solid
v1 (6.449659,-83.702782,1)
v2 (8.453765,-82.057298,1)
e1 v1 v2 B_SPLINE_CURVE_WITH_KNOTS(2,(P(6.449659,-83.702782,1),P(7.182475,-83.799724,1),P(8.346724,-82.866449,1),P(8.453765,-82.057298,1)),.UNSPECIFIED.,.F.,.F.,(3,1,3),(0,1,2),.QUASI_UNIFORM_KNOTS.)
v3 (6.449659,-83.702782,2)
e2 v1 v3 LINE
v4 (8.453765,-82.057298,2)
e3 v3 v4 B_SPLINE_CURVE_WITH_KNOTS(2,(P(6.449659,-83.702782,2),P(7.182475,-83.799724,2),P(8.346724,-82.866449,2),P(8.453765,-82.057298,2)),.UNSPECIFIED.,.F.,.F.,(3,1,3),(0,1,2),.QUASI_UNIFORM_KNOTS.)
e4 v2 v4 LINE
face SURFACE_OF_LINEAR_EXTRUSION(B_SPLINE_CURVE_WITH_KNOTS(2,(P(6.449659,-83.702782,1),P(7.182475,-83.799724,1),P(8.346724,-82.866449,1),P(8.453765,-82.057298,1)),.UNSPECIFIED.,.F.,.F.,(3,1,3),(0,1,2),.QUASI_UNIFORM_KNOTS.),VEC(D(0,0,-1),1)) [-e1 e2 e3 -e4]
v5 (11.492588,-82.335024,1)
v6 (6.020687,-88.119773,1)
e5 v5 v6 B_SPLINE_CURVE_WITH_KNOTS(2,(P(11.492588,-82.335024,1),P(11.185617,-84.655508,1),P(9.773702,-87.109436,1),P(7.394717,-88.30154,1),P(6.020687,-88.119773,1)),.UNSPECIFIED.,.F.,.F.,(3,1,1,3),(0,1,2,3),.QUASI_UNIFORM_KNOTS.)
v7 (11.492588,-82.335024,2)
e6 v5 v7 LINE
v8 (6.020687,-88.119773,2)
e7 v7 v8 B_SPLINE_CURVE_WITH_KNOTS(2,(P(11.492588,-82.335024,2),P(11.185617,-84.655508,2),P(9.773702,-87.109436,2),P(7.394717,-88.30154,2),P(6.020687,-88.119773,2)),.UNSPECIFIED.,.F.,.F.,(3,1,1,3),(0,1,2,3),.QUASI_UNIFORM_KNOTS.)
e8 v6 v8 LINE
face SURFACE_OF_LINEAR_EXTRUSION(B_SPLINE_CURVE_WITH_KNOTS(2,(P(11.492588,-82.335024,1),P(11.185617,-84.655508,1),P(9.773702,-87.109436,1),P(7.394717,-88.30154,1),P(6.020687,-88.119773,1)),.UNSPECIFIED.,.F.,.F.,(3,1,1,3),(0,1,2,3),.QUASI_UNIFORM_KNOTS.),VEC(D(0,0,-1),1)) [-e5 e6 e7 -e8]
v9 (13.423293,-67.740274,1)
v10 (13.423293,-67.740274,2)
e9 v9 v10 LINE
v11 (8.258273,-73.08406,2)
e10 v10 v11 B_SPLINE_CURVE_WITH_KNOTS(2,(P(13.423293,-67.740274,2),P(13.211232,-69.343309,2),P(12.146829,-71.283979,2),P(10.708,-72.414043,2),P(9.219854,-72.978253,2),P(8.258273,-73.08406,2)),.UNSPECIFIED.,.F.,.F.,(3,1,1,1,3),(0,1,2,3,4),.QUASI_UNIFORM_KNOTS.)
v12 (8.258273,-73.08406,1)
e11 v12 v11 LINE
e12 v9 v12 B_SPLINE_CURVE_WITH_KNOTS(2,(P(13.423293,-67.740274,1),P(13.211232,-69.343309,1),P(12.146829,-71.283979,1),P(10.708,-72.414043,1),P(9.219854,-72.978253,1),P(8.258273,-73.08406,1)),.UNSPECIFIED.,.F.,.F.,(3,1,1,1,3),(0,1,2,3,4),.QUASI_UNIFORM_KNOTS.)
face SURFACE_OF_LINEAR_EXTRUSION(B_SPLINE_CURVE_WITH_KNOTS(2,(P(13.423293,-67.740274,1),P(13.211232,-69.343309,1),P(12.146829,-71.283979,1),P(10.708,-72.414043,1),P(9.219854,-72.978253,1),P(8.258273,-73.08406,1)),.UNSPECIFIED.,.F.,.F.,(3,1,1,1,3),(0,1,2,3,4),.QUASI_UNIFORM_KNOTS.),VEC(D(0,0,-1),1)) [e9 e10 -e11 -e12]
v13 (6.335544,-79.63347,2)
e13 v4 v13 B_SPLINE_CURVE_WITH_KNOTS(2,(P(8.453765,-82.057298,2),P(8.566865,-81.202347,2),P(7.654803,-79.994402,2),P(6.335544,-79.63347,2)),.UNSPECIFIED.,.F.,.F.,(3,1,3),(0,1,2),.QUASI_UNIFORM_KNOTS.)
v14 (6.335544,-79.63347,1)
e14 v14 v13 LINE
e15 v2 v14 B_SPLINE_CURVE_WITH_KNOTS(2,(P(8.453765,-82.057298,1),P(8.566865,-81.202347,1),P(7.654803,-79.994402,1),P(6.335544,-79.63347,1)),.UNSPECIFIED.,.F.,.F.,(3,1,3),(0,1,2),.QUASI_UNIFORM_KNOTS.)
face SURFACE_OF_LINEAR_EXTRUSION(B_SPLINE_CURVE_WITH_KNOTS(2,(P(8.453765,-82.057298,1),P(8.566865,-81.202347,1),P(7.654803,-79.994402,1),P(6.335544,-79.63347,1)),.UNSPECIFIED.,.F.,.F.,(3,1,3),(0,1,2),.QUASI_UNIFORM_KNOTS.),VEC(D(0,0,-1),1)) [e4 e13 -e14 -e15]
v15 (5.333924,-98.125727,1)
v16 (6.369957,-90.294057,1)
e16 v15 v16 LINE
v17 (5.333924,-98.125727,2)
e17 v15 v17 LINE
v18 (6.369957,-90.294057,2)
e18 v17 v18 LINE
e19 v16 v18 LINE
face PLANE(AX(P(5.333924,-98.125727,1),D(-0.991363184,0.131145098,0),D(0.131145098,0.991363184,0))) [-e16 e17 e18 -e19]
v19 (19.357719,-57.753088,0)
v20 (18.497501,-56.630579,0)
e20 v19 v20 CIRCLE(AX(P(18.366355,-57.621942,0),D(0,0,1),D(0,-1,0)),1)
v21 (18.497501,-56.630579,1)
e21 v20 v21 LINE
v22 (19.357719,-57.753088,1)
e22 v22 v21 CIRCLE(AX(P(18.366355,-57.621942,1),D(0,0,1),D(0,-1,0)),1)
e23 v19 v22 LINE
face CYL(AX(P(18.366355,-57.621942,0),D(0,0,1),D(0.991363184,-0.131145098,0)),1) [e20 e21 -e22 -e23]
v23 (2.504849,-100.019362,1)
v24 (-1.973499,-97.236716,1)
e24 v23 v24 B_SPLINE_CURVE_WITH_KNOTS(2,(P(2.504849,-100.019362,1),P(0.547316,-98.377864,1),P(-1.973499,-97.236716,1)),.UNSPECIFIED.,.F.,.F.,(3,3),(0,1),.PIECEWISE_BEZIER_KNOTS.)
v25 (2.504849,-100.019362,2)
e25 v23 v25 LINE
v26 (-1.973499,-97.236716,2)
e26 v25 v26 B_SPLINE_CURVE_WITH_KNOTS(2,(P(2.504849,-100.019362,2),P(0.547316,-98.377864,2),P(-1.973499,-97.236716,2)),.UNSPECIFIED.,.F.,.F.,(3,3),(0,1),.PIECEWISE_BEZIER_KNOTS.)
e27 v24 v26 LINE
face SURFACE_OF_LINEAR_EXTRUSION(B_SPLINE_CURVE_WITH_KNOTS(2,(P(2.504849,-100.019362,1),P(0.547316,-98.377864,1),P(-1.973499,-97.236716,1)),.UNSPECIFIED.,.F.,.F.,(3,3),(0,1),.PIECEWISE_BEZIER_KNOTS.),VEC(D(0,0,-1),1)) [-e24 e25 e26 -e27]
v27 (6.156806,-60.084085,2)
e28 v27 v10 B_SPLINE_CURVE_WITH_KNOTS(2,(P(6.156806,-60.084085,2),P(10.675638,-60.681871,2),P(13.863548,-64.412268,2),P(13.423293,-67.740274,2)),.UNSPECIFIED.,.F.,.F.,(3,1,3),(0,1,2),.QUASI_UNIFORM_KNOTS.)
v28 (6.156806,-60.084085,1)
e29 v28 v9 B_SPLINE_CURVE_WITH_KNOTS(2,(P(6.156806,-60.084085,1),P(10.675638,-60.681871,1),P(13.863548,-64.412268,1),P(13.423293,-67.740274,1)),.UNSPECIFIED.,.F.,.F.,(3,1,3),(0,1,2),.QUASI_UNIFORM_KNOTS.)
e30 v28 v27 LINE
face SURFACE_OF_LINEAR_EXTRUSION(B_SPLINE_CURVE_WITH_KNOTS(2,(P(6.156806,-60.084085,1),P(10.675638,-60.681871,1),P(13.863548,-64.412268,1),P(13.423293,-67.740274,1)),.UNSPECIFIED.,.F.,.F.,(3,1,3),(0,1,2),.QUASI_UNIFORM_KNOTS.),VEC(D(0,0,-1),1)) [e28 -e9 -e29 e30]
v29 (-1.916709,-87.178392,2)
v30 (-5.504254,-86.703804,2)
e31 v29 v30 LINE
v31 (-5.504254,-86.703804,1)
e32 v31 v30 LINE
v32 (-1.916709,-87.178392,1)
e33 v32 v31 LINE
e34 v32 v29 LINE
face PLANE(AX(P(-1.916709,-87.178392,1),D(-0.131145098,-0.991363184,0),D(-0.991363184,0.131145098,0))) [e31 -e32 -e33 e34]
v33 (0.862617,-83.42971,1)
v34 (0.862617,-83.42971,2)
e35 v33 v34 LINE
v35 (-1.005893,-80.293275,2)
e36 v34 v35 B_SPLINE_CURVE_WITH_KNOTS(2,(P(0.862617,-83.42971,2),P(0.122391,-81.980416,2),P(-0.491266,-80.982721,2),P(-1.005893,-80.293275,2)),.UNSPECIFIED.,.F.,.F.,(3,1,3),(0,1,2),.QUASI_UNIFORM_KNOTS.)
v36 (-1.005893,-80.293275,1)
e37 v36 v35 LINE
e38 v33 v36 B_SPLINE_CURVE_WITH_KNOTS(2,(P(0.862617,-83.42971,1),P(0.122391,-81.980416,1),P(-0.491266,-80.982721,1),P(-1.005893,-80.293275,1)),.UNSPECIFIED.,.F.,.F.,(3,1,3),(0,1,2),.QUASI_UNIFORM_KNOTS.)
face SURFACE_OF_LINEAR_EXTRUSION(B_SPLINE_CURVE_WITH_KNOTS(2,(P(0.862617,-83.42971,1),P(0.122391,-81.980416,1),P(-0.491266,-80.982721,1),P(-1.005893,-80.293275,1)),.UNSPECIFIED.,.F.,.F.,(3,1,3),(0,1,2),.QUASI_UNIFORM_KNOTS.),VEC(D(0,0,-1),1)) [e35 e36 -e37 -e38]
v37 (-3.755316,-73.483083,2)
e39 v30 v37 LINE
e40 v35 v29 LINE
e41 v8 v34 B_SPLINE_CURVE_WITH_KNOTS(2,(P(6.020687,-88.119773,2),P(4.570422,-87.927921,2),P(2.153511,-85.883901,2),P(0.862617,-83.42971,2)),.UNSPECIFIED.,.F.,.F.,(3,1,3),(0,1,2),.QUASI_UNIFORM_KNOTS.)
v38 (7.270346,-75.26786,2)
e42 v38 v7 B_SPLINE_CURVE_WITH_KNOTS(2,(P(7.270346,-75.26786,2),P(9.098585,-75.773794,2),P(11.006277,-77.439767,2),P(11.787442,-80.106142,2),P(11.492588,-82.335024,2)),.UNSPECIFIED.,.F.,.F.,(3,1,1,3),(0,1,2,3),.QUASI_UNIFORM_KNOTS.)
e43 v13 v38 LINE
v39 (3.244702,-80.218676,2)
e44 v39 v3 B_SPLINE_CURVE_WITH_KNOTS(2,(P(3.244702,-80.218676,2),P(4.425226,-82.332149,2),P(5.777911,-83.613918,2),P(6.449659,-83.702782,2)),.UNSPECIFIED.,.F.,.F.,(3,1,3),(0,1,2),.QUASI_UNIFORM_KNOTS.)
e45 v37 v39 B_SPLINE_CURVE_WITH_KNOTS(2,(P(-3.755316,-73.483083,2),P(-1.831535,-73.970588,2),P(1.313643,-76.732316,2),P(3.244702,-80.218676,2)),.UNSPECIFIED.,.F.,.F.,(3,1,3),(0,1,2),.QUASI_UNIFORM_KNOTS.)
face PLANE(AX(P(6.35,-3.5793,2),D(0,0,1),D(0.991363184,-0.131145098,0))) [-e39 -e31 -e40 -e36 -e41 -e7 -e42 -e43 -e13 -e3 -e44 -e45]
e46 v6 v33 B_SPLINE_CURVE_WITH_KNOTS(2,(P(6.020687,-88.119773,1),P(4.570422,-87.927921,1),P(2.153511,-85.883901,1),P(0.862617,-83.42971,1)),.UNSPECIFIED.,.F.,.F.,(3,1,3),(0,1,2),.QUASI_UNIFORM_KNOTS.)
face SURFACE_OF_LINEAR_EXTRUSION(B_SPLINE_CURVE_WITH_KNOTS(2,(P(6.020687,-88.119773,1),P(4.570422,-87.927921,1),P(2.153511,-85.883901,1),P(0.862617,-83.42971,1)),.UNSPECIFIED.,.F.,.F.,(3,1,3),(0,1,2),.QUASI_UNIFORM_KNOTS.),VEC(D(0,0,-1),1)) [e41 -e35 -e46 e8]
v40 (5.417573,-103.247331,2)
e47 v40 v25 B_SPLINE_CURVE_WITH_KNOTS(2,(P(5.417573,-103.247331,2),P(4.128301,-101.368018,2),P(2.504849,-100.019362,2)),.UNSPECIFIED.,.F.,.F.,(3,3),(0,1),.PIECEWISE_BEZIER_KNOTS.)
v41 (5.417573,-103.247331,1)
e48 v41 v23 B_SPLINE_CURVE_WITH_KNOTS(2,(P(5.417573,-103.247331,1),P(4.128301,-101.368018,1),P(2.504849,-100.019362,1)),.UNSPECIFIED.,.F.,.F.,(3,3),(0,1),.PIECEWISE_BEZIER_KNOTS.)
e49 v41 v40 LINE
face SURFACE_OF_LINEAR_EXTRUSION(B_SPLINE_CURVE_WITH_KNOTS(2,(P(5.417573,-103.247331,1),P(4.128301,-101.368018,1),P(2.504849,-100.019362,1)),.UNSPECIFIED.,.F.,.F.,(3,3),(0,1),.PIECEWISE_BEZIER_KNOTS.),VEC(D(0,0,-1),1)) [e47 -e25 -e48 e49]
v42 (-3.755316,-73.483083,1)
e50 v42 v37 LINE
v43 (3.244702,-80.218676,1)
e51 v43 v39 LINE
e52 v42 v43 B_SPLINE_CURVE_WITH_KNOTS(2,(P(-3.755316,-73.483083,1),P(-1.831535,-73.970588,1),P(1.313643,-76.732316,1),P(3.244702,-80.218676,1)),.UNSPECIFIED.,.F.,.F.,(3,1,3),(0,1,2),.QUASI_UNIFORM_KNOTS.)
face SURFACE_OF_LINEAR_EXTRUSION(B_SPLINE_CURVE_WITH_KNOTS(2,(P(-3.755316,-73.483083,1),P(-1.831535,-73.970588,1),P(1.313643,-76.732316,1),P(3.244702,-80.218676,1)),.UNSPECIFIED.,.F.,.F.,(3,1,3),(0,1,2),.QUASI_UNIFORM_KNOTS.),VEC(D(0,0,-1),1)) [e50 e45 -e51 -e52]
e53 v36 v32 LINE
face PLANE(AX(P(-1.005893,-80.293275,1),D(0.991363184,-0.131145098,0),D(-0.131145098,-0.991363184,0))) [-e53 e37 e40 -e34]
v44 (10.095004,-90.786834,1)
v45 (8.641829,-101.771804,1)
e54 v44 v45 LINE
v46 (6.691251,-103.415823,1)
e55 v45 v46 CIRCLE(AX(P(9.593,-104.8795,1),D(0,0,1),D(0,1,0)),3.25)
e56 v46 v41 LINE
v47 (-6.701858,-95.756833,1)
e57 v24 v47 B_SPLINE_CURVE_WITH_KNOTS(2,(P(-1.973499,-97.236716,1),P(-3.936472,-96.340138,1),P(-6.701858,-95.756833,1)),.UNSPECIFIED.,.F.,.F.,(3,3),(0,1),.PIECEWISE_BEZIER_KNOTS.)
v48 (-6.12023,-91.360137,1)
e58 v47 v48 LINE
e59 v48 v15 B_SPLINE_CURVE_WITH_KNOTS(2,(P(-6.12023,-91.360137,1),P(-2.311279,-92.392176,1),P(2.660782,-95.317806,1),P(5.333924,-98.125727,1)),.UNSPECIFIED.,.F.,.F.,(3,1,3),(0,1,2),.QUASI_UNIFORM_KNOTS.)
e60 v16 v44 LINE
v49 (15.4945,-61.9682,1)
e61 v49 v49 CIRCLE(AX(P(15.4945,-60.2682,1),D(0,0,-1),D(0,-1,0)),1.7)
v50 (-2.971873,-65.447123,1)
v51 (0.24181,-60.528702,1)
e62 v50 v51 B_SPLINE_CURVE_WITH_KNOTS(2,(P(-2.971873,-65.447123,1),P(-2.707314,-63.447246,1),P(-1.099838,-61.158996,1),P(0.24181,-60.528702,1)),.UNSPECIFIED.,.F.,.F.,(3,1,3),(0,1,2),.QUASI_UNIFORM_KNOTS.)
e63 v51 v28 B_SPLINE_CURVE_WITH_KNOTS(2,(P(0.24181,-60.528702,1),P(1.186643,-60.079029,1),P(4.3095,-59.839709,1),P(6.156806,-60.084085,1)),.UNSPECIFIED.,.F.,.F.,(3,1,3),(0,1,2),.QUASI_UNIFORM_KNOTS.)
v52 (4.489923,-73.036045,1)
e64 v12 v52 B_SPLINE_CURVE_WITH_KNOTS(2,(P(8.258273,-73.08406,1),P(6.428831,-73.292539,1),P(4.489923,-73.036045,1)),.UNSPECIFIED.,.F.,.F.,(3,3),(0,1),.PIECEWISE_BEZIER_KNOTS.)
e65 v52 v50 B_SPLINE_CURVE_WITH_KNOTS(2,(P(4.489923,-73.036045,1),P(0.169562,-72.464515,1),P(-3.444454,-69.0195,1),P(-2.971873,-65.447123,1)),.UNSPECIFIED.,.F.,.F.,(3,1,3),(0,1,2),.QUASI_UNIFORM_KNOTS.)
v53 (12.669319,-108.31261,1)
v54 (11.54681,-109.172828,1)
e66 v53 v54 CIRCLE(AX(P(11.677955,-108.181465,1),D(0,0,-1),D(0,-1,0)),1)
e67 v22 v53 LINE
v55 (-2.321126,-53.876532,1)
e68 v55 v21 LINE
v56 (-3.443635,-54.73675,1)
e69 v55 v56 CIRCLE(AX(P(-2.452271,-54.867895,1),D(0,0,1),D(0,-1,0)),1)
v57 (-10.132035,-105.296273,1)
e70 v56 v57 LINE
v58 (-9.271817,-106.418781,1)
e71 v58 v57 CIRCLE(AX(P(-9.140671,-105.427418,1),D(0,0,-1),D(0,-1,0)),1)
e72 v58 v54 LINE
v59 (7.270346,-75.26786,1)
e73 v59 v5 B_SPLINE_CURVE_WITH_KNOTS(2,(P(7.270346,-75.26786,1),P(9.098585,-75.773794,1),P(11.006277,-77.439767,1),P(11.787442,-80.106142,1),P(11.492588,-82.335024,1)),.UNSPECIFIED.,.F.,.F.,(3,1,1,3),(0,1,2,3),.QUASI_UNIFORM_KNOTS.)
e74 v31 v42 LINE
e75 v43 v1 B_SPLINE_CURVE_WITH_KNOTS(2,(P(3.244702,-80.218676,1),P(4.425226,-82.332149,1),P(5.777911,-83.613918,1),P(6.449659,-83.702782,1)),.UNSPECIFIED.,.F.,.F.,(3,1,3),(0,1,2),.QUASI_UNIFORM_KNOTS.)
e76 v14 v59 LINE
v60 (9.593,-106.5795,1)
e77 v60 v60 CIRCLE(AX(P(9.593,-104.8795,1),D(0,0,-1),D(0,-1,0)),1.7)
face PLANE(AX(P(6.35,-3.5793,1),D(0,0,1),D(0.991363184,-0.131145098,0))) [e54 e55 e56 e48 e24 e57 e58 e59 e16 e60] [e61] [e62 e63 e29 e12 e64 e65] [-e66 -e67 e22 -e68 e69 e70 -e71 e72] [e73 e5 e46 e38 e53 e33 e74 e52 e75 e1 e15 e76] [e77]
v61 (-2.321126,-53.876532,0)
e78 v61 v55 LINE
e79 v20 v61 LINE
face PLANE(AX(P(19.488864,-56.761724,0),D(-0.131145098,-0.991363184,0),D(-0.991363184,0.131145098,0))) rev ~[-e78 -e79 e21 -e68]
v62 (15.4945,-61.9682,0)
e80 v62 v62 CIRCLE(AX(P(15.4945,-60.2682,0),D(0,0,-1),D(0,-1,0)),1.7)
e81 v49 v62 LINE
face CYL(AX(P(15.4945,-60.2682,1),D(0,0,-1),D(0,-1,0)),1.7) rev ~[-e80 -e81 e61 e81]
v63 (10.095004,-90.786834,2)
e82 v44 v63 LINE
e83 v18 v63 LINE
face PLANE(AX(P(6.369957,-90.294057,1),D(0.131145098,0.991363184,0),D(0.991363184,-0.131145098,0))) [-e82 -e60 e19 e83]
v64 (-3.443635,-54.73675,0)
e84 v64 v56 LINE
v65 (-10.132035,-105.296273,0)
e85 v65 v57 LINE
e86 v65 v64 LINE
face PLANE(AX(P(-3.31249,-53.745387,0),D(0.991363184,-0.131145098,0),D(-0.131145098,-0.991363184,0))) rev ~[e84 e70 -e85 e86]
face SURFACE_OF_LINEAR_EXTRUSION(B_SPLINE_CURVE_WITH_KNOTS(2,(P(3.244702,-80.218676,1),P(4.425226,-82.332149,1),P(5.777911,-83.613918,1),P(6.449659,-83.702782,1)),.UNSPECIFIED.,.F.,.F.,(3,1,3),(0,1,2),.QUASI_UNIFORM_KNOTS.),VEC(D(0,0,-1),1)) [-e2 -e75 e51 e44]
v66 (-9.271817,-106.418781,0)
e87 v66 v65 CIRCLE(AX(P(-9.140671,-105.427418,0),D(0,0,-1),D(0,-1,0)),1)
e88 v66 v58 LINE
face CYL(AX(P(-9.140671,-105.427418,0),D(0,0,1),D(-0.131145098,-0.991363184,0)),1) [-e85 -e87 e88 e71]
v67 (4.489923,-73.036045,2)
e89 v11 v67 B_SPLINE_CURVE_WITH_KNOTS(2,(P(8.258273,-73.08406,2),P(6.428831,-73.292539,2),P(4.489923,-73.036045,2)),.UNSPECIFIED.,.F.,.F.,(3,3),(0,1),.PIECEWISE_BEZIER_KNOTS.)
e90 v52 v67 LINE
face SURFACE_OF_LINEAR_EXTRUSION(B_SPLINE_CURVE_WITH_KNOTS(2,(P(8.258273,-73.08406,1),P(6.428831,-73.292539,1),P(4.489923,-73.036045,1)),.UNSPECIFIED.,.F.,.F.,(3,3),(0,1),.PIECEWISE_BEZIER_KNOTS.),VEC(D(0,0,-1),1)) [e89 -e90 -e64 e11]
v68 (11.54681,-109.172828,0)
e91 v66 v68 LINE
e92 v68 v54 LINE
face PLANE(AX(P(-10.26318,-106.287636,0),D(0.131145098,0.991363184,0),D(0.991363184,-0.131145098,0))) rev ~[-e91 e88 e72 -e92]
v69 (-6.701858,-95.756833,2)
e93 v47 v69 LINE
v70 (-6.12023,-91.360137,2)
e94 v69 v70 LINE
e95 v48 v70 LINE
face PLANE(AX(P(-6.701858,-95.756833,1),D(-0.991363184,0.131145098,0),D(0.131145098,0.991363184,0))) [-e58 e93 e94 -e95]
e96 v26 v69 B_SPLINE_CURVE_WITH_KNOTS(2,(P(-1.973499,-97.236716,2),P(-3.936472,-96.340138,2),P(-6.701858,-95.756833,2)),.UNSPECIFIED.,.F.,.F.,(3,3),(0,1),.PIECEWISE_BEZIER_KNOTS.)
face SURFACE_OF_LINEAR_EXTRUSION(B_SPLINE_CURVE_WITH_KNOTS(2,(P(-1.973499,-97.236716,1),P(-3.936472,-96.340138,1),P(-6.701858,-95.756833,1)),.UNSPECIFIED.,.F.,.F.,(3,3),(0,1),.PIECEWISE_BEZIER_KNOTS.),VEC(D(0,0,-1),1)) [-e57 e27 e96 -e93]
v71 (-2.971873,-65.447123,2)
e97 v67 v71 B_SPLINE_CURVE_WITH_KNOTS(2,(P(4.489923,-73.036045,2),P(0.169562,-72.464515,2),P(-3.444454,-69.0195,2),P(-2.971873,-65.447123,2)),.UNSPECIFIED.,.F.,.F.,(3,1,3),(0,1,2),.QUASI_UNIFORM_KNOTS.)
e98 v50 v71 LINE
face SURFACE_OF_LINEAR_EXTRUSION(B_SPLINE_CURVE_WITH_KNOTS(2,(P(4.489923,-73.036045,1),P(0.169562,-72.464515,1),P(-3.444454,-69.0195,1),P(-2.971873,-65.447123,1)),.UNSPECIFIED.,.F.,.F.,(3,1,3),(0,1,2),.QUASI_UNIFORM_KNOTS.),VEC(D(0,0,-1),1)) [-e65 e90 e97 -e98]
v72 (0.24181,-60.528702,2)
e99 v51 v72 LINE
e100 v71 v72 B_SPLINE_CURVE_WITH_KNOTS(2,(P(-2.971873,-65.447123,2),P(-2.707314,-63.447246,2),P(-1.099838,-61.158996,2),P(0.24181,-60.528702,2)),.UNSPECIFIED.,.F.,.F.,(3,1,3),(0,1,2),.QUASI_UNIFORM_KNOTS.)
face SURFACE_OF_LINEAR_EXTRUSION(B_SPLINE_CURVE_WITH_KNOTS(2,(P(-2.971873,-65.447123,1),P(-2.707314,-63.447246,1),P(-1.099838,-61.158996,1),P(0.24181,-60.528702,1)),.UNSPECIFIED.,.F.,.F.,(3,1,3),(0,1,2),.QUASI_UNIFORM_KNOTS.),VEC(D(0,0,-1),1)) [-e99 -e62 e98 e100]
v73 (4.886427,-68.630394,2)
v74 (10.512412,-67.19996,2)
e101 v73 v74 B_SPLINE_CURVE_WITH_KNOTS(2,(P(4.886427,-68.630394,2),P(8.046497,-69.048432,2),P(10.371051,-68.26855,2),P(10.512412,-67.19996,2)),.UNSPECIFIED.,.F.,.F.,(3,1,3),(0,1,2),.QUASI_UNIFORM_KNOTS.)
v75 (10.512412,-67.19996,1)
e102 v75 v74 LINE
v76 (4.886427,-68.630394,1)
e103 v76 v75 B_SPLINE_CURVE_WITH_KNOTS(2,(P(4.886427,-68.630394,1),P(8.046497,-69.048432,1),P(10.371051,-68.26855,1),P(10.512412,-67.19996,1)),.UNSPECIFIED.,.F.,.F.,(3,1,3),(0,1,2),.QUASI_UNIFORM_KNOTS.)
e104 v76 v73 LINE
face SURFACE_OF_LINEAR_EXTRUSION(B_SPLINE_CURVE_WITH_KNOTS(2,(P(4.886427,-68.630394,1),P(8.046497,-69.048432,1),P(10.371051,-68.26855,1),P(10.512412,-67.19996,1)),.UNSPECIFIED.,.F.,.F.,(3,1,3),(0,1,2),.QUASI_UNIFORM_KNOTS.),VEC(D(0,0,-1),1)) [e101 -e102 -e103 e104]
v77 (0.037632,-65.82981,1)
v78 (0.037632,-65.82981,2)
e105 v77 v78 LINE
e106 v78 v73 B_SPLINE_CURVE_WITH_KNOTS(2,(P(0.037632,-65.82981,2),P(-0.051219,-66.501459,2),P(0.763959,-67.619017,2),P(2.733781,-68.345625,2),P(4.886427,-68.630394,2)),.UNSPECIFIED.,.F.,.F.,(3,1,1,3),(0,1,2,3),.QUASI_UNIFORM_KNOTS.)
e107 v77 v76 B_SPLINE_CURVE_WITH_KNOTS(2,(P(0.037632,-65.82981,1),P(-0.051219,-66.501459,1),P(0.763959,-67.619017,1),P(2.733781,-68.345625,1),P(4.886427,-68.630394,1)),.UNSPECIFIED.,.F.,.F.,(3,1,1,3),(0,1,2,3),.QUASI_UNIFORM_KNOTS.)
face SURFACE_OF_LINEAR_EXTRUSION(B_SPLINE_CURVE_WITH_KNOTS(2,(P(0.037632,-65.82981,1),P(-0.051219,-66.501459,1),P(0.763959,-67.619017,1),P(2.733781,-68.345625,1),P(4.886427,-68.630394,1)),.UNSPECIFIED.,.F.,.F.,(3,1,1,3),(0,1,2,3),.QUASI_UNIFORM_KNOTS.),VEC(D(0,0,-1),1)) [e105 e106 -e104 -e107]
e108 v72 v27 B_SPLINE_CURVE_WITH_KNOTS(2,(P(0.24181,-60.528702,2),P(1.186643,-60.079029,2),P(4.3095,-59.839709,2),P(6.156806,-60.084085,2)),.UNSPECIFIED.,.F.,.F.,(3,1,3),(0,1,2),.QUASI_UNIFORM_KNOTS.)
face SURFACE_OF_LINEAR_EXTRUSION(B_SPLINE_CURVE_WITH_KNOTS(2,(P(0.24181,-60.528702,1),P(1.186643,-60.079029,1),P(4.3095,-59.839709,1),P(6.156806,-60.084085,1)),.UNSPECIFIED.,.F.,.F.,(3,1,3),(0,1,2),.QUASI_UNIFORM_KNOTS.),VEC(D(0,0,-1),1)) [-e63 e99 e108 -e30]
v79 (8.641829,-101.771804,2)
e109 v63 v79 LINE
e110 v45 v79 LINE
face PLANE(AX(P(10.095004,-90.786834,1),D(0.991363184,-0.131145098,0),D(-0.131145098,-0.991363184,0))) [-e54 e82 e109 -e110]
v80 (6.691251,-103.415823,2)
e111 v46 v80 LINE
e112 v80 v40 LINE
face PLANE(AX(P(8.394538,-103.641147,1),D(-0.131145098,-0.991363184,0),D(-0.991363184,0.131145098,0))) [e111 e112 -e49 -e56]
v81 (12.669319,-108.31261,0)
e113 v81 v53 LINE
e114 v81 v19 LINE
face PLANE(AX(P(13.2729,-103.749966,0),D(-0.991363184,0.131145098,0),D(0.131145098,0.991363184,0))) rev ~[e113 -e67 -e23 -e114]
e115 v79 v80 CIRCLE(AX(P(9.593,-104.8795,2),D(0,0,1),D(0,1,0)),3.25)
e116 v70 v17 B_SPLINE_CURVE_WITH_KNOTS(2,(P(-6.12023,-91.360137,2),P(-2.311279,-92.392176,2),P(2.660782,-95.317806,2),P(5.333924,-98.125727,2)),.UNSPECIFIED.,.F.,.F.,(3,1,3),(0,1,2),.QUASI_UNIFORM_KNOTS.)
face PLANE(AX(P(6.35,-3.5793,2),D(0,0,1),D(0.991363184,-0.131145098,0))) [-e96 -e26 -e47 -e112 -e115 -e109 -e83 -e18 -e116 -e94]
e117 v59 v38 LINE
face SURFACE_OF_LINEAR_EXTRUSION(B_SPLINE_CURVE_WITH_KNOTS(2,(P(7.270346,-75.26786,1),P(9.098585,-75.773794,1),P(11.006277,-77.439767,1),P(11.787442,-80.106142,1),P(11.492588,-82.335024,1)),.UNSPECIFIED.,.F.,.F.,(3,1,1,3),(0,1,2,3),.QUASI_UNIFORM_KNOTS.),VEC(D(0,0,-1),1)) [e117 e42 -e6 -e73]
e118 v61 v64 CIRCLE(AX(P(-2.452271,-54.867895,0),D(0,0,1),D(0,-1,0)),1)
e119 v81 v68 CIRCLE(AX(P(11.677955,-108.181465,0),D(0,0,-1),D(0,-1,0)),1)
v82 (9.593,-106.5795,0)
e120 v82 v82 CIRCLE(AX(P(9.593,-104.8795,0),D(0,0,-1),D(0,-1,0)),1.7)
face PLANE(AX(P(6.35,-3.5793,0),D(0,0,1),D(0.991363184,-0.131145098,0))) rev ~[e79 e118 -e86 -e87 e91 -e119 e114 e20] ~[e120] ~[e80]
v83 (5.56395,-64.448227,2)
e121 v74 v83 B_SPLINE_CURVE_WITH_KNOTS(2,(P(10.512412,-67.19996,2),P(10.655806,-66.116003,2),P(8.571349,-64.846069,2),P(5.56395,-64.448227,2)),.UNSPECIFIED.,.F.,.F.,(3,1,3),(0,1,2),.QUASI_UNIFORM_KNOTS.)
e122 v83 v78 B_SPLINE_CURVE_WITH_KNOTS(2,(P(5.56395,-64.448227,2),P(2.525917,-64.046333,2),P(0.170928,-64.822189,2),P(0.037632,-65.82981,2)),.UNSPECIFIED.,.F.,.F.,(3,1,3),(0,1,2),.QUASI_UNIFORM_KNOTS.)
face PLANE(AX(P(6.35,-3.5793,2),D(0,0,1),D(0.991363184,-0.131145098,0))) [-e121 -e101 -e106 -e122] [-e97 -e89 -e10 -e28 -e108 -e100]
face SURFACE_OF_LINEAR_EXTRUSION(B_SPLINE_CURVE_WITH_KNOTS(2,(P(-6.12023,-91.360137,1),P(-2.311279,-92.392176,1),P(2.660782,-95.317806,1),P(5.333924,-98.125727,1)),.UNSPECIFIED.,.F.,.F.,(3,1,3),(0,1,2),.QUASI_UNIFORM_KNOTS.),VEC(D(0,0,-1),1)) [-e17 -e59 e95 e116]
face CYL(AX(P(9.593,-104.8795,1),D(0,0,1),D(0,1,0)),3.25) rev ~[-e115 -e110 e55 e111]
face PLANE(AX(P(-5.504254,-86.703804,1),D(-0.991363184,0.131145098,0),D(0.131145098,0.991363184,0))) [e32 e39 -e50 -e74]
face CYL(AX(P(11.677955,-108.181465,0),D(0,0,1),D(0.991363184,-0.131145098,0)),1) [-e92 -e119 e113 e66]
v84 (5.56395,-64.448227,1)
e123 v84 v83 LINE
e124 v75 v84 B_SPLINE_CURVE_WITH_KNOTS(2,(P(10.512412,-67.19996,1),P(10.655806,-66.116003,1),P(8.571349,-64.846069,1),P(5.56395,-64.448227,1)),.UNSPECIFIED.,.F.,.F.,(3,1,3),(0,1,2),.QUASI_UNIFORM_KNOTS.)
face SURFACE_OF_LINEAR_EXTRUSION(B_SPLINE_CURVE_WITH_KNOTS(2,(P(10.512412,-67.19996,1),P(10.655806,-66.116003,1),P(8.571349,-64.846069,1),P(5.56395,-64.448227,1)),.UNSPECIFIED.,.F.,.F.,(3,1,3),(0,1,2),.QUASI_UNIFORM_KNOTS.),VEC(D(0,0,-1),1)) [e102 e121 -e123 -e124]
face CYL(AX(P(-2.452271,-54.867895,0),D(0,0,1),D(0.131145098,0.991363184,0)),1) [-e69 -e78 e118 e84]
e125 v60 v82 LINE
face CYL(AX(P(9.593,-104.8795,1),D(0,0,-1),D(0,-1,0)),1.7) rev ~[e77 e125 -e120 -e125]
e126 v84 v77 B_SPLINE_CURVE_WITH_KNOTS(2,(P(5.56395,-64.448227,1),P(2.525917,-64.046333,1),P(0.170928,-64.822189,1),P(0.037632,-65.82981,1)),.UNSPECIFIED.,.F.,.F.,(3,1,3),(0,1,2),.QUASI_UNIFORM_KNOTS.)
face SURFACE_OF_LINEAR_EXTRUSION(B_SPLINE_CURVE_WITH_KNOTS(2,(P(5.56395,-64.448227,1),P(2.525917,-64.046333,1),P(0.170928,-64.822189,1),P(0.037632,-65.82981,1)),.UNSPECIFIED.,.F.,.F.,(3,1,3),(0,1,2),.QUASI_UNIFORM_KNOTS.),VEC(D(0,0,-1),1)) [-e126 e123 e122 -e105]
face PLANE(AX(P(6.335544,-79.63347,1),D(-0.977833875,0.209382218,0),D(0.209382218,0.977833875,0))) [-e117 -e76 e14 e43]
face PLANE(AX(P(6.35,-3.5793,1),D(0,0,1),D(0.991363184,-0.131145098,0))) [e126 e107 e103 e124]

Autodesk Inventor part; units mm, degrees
ref_plane "YZ Plane" through (0, 0, 0) normal (1, 0, 0) x (0, 1, 0)
ref_plane "XZ Plane" through (0, 0, 0) normal (0, 1, 0) x (-1, 0, 0)
ref_plane "XY Plane" through (0, 0, 0) normal (0, 0, 1) x (1, 0, 0)
ref_plane "Work Plane1" through (6.35, -3.5793, 0) normal (0, 0, 1) x (0.9913632, -0.1311451, 0)
sketch "Sketch1" plane through (6.35, -3.5793, 0) normal (0, 0, 1) x (0.9913632, -0.1311451, 0)
  line L0 (9.4349, -35.1273) -> (9.1077, -32.6537) projected
  line L1 (9.1077, -32.6537) -> (11.809, -32.2963) projected
  line L2 (11.809, -32.2963) -> (11.8581, -32.8269) projected
  line L3 (11.8581, -32.8269) -> (12.0044, -33.5342) projected
  spline S0 degree 2 poles (12.0044, -33.5342) (12.2496, -34.5127) (12.9939, -35.3621) (13.7166, -35.5719) knots 0 0 0 1 2 2 2 projected
  line L4 (13.7166, -35.5719) -> (14.274, -35.6456) projected
  line L5 (14.274, -35.6456) -> (14.6409, -38.4193) projected
  line L6 (14.6409, -38.4193) -> (0.7619, -40.2553) projected
  line L7 (0.7619, -40.2553) -> (0.2443, -36.3431) projected
  line L8 (0.2443, -36.3431) -> (9.4349, -35.1273) projected
  line L9 (-0.9482, -27.3284) -> (-1.4726, -23.3645) projected
  line L10 (-1.4726, -23.3645) -> (12.4065, -21.5284) projected
  line L11 (12.4065, -21.5284) -> (13.1225, -26.9414) projected
  spline S1 degree 2 poles (13.1225, -26.9414) (13.3717, -28.825) (11.9849, -30.9988) (10.2534, -31.5228) knots 0 0 0 1 2 2 2 projected
  spline S2 degree 2 poles (10.2534, -31.5228) (9.6848, -31.6822) (9.2839, -31.7563) (9.1286, -31.7769) knots 0 0 0 1 2 2 2 projected
  spline S3 degree 2 poles (9.1286, -31.7769) (7.1725, -32.0356) (4.658, -29.904) (4.3718, -27.7409) knots 0 0 0 1 2 2 2 projected
  line L12 (4.3718, -27.7409) -> (4.2267, -26.6439) projected
  line L13 (4.2267, -26.6439) -> (-0.9482, -27.3284) projected
  line L14 (-4.2533, -2.344) -> (-4.7325, 1.2784) projected
  line L15 (-4.7325, 1.2784) -> (9.1465, 3.1145) projected
  line L16 (9.1465, 3.1145) -> (9.8448, -2.1639) projected
  line L17 (9.8448, -2.1639) -> (2.0845, -4.5596) projected
  line L18 (2.0845, -4.5596) -> (10.2008, -4.8549) projected
  line L19 (10.2008, -4.8549) -> (10.9018, -10.154) projected
  line L20 (10.9018, -10.154) -> (-2.9773, -11.99) projected
  line L21 (-2.9773, -11.99) -> (-3.4565, -8.3676) projected
  line L22 (-3.4565, -8.3676) -> (6.1067, -7.1025) projected
  line L23 (6.1067, -7.1025) -> (-3.6564, -6.8565) projected
  line L24 (-3.6564, -6.8565) -> (-4.0562, -3.8344) projected
  line L25 (-4.0562, -3.8344) -> (5.3099, -1.0789) projected
  line L26 (5.3099, -1.0789) -> (-4.2533, -2.344) projected
  line L27 (-6.2934, 13.0772) -> (-6.8178, 17.0412) projected
  line L28 (-6.8178, 17.0412) -> (7.0613, 18.8772) projected
  line L29 (7.0613, 18.8772) -> (7.7774, 13.4643) projected
  spline S4 degree 2 poles (7.7774, 13.4643) (8.0266, 11.5806) (6.6397, 9.4068) (4.9082, 8.8829) knots 0 0 0 1 2 2 2 projected
  spline S5 degree 2 poles (4.9082, 8.8829) (4.3396, 8.7234) (3.9387, 8.6493) (3.7835, 8.6288) knots 0 0 0 1 2 2 2 projected
  spline S6 degree 2 poles (3.7835, 8.6288) (1.8273, 8.37) (-0.6872, 10.5016) (-0.9734, 12.6647) knots 0 0 0 1 2 2 2 projected
  line L30 (-0.9734, 12.6647) -> (-1.1185, 13.7618) projected
  line L31 (-1.1185, 13.7618) -> (-6.2934, 13.0772) projected
  line L32 (-8.8852, 32.6694) -> (-9.4096, 36.6333) projected
  line L33 (-9.4096, 36.6333) -> (4.4695, 38.4694) projected
  line L34 (4.4695, 38.4694) -> (5.1856, 33.0564) projected
  spline S7 degree 2 poles (5.1856, 33.0564) (5.4348, 31.1728) (4.0479, 28.999) (2.3164, 28.475) knots 0 0 0 1 2 2 2 projected
  spline S8 degree 2 poles (2.3164, 28.475) (1.7478, 28.3156) (1.3469, 28.2415) (1.1917, 28.2209) knots 0 0 0 1 2 2 2 projected
  spline S9 degree 2 poles (1.1917, 28.2209) (-0.7645, 27.9622) (-3.279, 30.0938) (-3.5652, 32.2569) knots 0 0 0 1 2 2 2 projected
  line L35 (-3.5652, 32.2569) -> (-3.7103, 33.3539) projected
  line L36 (-3.7103, 33.3539) -> (-8.8852, 32.6694) projected
  line L37 (-6.9369, 17.9416) -> (-8.0596, 26.4284) projected
  line L38 (-8.0596, 26.4284) -> (5.8195, 28.2645) projected
  line L39 (5.8195, 28.2645) -> (6.923, 19.9225) projected
  line L40 (6.923, 19.9225) -> (3.7146, 19.4981) projected
  line L41 (3.7146, 19.4981) -> (3.1354, 23.8761) projected
  line L42 (3.1354, 23.8761) -> (1.0655, 23.6022) projected
  line L43 (1.0655, 23.6022) -> (1.609, 19.4934) projected
  line L44 (1.609, 19.4934) -> (-1.4649, 19.0867) projected
  line L45 (-1.4649, 19.0867) -> (-2.0084, 23.1956) projected
  line L46 (-2.0084, 23.1956) -> (-4.3268, 22.8889) projected
  line L47 (-4.3268, 22.8889) -> (-3.7284, 18.366) projected
  line L48 (-3.7284, 18.366) -> (-6.9369, 17.9416) projected
  line L49 (-2.3023, -17.0925) -> (-2.7993, -13.3355) projected
  line L50 (-2.7993, -13.3355) -> (11.0798, -11.4995) projected
  line L51 (11.0798, -11.4995) -> (11.5768, -15.2564) projected
  line L52 (11.5768, -15.2564) -> (4.8598, -16.145) projected
  line L53 (4.8598, -16.145) -> (8.406, -17.3187) projected
  line L54 (8.406, -17.3187) -> (8.9249, -21.2413) projected
  line L55 (8.9249, -21.2413) -> (4.2393, -19.0178) projected
  line L56 (4.2393, -19.0178) -> (-1.5205, -23.0022) projected
  line L57 (-1.5205, -23.0022) -> (-2.0504, -18.9968) projected
  line L58 (-2.0504, -18.9968) -> (1.2432, -16.9078) projected
  line L59 (1.2432, -16.9078) -> (0.4818, -16.7242) projected
  line L60 (0.4818, -16.7242) -> (-2.3023, -17.0925) projected
  line L61 (20, -51) -> (-3, -51)
  line L62 (-3, -51) -> (-3, -104)
  line L63 (-3, -104) -> (20, -104)
  line L64 (20, -104) -> (20, -51)
  circle A0 centre (16.3103, -49.711) radius 1.95 projected
  circle A1 centre (-20.0656, -79.7409) radius 1.95 projected
  circle A2 centre (-37.1145, 49.1363) radius 1.95 projected
  line L65 (11.0027, -81.1536) -> (12.4808, -77.5789) projected
  line L66 (7.1679, -81.6609) -> (11.0027, -81.1536) projected
  line L67 (4.8111, -78.5935) -> (7.1679, -81.6609) projected
  line L68 (6.2892, -75.0188) -> (4.8111, -78.5935) projected
  line L69 (10.124, -74.5115) -> (6.2892, -75.0188) projected
  line L70 (12.4808, -77.5789) -> (10.124, -74.5115) projected
  line L71 (2.8138, -48.7477) -> (1.3358, -52.3224) projected
  line L72 (6.6487, -48.2404) -> (2.8138, -48.7477) projected
  line L73 (9.0054, -51.3078) -> (6.6487, -48.2404) projected
  line L74 (7.5273, -54.8825) -> (9.0054, -51.3078) projected
  line L75 (3.6925, -55.3898) -> (7.5273, -54.8825) projected
  line L76 (1.3358, -52.3224) -> (3.6925, -55.3898) projected
  line L77 (9.7896, -71.9835) -> (11.2677, -68.4088) projected
  line L78 (5.9548, -72.4908) -> (9.7896, -71.9835) projected
  line L79 (3.598, -69.4234) -> (5.9548, -72.4908) projected
  line L80 (5.0761, -65.8487) -> (3.598, -69.4234) projected
  line L81 (8.9109, -65.3414) -> (5.0761, -65.8487) projected
  line L82 (11.2677, -68.4088) -> (8.9109, -65.3414) projected
  line L83 (8.5514, -92.1198) -> (7.0733, -95.6945) projected
  line L84 (12.3863, -91.6125) -> (8.5514, -92.1198) projected
  line L85 (14.743, -94.6799) -> (12.3863, -91.6125) projected
  line L86 (13.2649, -98.2547) -> (14.743, -94.6799) projected
  line L87 (9.4301, -98.762) -> (13.2649, -98.2547) projected
  line L88 (7.0733, -95.6945) -> (9.4301, -98.762) projected
  circle A3 centre (-24, -50) radius 1.95 projected
  line L89 (-23.7833, -80.2327) -> (-27.715, -50.5115) projected
  arc A4 (-23.7833, -80.2327) -> (-21.1747, -83.3231) centre (-20.0656, -79.7409) ccw projected
  line L90 (7.3797, -99.9093) -> (-21.1747, -83.3231) projected
  arc A5 (7.3797, -99.9093) -> (7.8548, -100.0043) centre (7.7565, -99.2608) ccw projected
  line L91 (25.6777, -97.6465) -> (7.8548, -100.0043) projected
  arc A6 (25.6777, -97.6465) -> (26.3228, -96.8047) centre (25.5793, -96.903) ccw projected
  line L92 (8.768, 35.8971) -> (26.3228, -96.8047) projected
  arc A7 (8.768, 35.8971) -> (5.0328, 42.3573) centre (-0.8978, 34.6184) ccw projected
  line L93 (-5.2293, 50.2216) -> (5.0328, 42.3573) projected
  arc A8 (-5.2293, 50.2216) -> (-12.4386, 52.1485) centre (-11.1599, 42.4827) ccw projected
  line L94 (-13.3095, 52.0332) -> (-12.4386, 52.1485) projected
  line L95 (-37.6265, 52.8512) -> (-13.3095, 52.0332) projected
  arc A9 (-37.6265, 52.8512) -> (-40.8346, 48.6639) centre (-37.1145, 49.1363) ccw projected
  line L96 (-26.3408, 0.1259) -> (-40.8346, 48.6639) projected
  line L97 (-27.715, -50.5115) -> (-26.3408, 0.1259) projected
  circle A10 centre (22.2118, -94.3224) radius 1.95 projected
  point P0 (-6.7645, 2.7156)
  point P1 (1.0219, -104)
  point P2 (20, -103)
  dimension "d0" = 23
  dimension "d1" = 53
extrude "Extrusion1" add sketch "Sketch1" along normal blind 1 contours L64 L91 A5 L90 L62 L61 L71 L76 L75 L74 L73 A0 | A0 L61 | L64 L63 L62 L90 A5 L91 | L73 L74 L75 L76 L71 L61 | L66 L67 L68 L69 L70 L65 | L78 L79 L80 L81 L82 L77 | L84 L85 L86 L87 L88 L83 picked at (16.6806, -51.1045)
fillet "Fillet1" radius 1 4 edges at (-3.3125, -53.7454, 0.5) (-10.2632, -106.2877, 0.5) (12.5381, -109.304, 0.5) (19.4888, -56.7617, 0.5)
sketch "Sketch2" plane through (6.35, -3.5793, 1) normal (0, 0, 1) x (0.9913632, -0.1311451, 0)
  line L0 (15.4266, -55.1181) -> (15.4266, -70.8864) construction
  line L1 (15.4266, -70.8864) -> (9.1495, -70.8864) construction
  line L2 (9.1495, -70.8864) -> (9.1495, -55.1181) construction
  line L3 (9.1495, -55.1181) -> (15.4266, -55.1181) construction
  spline S0 degree 2 poles (7.2188, -56.0421) (11.777, -56.0421) (15.4266, -59.3222) (15.4266, -62.6792) knots 0 0 0 1 2 2 2
  spline S1 degree 2 poles (15.4266, -62.6792) (15.4266, -64.2962) (14.6259, -66.3597) (13.3477, -67.6687) (11.9464, -68.4232) (11.007, -68.6542) knots 0 0 0 1 2 3 4 4 4
  spline S2 degree 2 poles (11.007, -68.6542) (9.2207, -69.1008) (7.2649, -69.1008) knots 0 0 0 1 1 1
  spline S3 degree 2 poles (7.2649, -69.1008) (2.9069, -69.1008) (-1.1277, -66.1595) (-1.1277, -62.556) knots 0 0 0 1 2 2 2
  spline S4 degree 2 poles (-1.1277, -62.556) (-1.1277, -60.5387) (0.1658, -58.0594) (1.4132, -57.2586) knots 0 0 0 1 2 2 2
  spline S5 degree 2 poles (1.4132, -57.2586) (2.2909, -56.6889) (5.3554, -56.0421) (7.2188, -56.0421) knots 0 0 0 1 2 2 2
  spline S6 degree 2 poles (7.2034, -60.4463) (4.1389, -60.4463) (1.906, -61.5243) (1.906, -62.5407) knots 0 0 0 1 2 2 2
  spline S7 degree 2 poles (1.906, -62.5407) (1.906, -63.2182) (2.8607, -64.2192) (4.9088, -64.6812) (7.0802, -64.6812) knots 0 0 0 1 2 3 3 3
  spline S8 degree 2 poles (7.0802, -64.6812) (10.2678, -64.6812) (12.47, -63.6032) (12.47, -62.5253) knots 0 0 0 1 2 2 2
  spline S9 degree 2 poles (12.47, -62.5253) (12.47, -61.4319) (10.237, -60.4463) (7.2034, -60.4463) knots 0 0 0 1 2 2 2
  line L4 (-0.8505, -83.9612) -> (-0.8505, -70.6253)
  spline S10 degree 2 poles (-0.8505, -70.6253) (1.1206, -70.8563) (4.6008, -73.1817) (6.9724, -76.3847) knots 0 0 0 1 2 2 2
  spline S11 degree 2 poles (6.9724, -76.3847) (8.4199, -78.3251) (9.929, -79.4184) (10.6066, -79.4184) knots 0 0 0 1 2 2 2
  spline S12 degree 2 poles (10.6066, -79.4184) (11.3458, -79.4184) (12.3776, -78.3405) (12.3776, -77.5243) knots 0 0 0 1 2 2 2
  spline S13 degree 2 poles (12.3776, -77.5243) (12.3776, -76.6619) (11.315, -75.584) (9.9598, -75.3992) knots 0 0 0 1 2 2 2
  line L5 (9.9598, -75.3992) -> (10.314, -70.9487)
  spline S14 degree 2 poles (10.314, -70.9487) (12.1928, -71.2105) (14.3025, -72.6119) (15.4266, -75.1528) (15.4266, -77.4011) knots 0 0 0 1 2 3 3 3
  spline S15 degree 2 poles (15.4266, -77.4011) (15.4266, -79.7418) (14.3487, -82.3597) (12.1466, -83.8535) (10.7606, -83.8535) knots 0 0 0 1 2 3 3 3
  spline S16 degree 2 poles (10.7606, -83.8535) (9.2977, -83.8535) (6.6336, -82.1441) (5.032, -79.8804) knots 0 0 0 1 2 2 2
  spline S17 degree 2 poles (5.032, -79.8804) (4.1081, -78.5407) (3.3689, -77.6321) (2.7683, -77.0161) knots 0 0 0 1 2 2 2
  line L6 (2.7683, -77.0161) -> (2.7683, -83.9612)
  line L7 (2.7683, -83.9612) -> (-0.8505, -83.9612)
  line L8 (15.1495, -85.9632) -> (15.1495, -98.9295)
  line L9 (15.1495, -98.9295) -> (12.1466, -98.9295)
  spline S18 degree 2 poles (12.1466, -98.9295) (10.622, -97.2355) (8.8357, -96.1114) knots 0 0 0 1 1 1
  spline S19 degree 2 poles (8.8357, -96.1114) (6.6798, -94.7408) (4.0311, -93.9401) knots 0 0 0 1 1 1
  spline S20 degree 2 poles (4.0311, -93.9401) (1.9675, -93.3087) (-0.8505, -93.0931) knots 0 0 0 1 1 1
  line L10 (-0.8505, -93.0931) -> (-0.8505, -88.6581)
  spline S21 degree 2 poles (-0.8505, -88.6581) (3.0609, -89.1817) (8.3737, -91.43) (11.392, -93.8631) knots 0 0 0 1 2 2 2
  line L11 (11.392, -93.8631) -> (11.392, -85.9632)
  line L12 (11.392, -85.9632) -> (15.1495, -85.9632)
  point P0 (-6.7645, 2.7156)
extrude "Extrusion2" add sketch "Sketch2" along normal blind 1
sketch "Sketch3" plane through (6.35, -3.5793, 1) normal (0, 0, 1) x (0.9913632, -0.1311451, 0)
  arc A0 (19.4855, -94.683) -> (21.161, -96.8637) centre (22.2118, -94.3224) ccw construction
  arc A1 (20.5363, -92.1417) -> (19.4855, -94.683) centre (22.2118, -94.3224) ccw construction
  arc A2 (23.2626, -91.781) -> (20.5363, -92.1417) centre (22.2118, -94.3224) ccw construction
  arc A3 (24.938, -93.9617) -> (23.2626, -91.781) centre (22.2118, -94.3224) ccw construction
  arc A4 (23.8872, -96.503) -> (24.938, -93.9617) centre (22.2118, -94.3224) ccw construction
  arc A5 (21.161, -96.8637) -> (23.8872, -96.503) centre (22.2118, -94.3224) ccw construction
  arc A6 (21.0223, -95.2362) -> (20.7342, -94.0639) centre (22.2118, -94.3224) ccw construction
  arc A7 (20.7342, -94.0639) -> (21.0223, -95.2362) centre (22.2118, -94.3224) ccw construction
  arc A8 (14.6348, -47.5303) -> (13.584, -50.0717) centre (16.3103, -49.711) ccw construction
  arc A9 (17.361, -47.1697) -> (14.6348, -47.5303) centre (16.3103, -49.711) ccw construction
  arc A10 (19.0365, -49.3504) -> (17.361, -47.1697) centre (16.3103, -49.711) ccw construction
  arc A11 (17.9857, -51.8917) -> (19.0365, -49.3504) centre (16.3103, -49.711) ccw construction
  arc A12 (15.2595, -52.2523) -> (17.9857, -51.8917) centre (16.3103, -49.711) ccw construction
  arc A13 (13.584, -50.0717) -> (15.2595, -52.2523) centre (16.3103, -49.711) ccw construction
  arc A14 (14.9241, -49.1379) -> (15.7953, -48.3022) centre (16.3103, -49.711) ccw construction
  arc A15 (15.7953, -48.3022) -> (14.9241, -49.1379) centre (16.3103, -49.711) ccw construction
  line L0 (20, -103) -> (20, -52) projected
  point P0 (-6.7645, 2.7156)
  point P1 (16.5, -55)
  point P2 (16.5, -100)
  point P3 (20, -77.5)
  dimension "d14" = 45
  dimension "d15" = 3.5
  dimension "d16" = 22.5
hole "Hole1" at (15.4945, -60.2682, 1) at (9.593, -104.8795, 1) direction (0, 0, -1) diameter 3.4 end through all clearance for "Socket Head Cap Screw" size "M3" standard "Ansi Metric M Profile"
sketch "Sketch4" plane through (6.35, -3.5793, 1) normal (0, 0, 1) x (0.9913632, -0.1311451, 0)
  circle A0 centre (16.5, -55) radius 1.7 projected
  circle A1 centre (16.5, -100) radius 1.7 projected
  arc A2 (20, -52) -> (19, -51) centre (19, -52) ccw projected
  line L0 (19, -51) -> (-2, -51) projected
  arc A3 (-2, -51) -> (-3, -52) centre (-2, -52) ccw projected
  line L1 (-3, -52) -> (-3, -103) projected
  arc A4 (-3, -103) -> (-2, -104) centre (-2, -103) ccw projected
  line L2 (-2, -104) -> (19, -104) projected
  arc A5 (19, -104) -> (20, -103) centre (19, -103) ccw projected
  line L3 (20, -103) -> (20, -52) projected
  line L4 (15.1495, -98.9295) -> (12.1466, -98.9295) projected
  line L5 (-0.8505, -93.0931) -> (-0.8505, -88.6581) projected
  line L6 (11.392, -93.8631) -> (11.392, -85.9632) projected
  line L7 (11.392, -85.9632) -> (15.1495, -85.9632) projected
  line L8 (15.1495, -85.9632) -> (15.1495, -98.9295) projected
  line L9 (9.9598, -75.3992) -> (10.314, -70.9487) projected
  line L10 (2.7683, -77.0161) -> (2.7683, -83.9612) projected
  line L11 (2.7683, -83.9612) -> (-0.8505, -83.9612) projected
  line L12 (-0.8505, -83.9612) -> (-0.8505, -70.6253) projected
  point P0 (-6.7645, 2.7156)
hole "Hole2" at (9.593, -104.8795, 1) direction (0, 0, 1) diameter 3.2 end through all counterbore diameter 6.5 counterbore depth 3 clearance for "Socket Head Cap Screw" size "M3" standard "Ansi Metric M Profile"
properties part number "ID Plate"
